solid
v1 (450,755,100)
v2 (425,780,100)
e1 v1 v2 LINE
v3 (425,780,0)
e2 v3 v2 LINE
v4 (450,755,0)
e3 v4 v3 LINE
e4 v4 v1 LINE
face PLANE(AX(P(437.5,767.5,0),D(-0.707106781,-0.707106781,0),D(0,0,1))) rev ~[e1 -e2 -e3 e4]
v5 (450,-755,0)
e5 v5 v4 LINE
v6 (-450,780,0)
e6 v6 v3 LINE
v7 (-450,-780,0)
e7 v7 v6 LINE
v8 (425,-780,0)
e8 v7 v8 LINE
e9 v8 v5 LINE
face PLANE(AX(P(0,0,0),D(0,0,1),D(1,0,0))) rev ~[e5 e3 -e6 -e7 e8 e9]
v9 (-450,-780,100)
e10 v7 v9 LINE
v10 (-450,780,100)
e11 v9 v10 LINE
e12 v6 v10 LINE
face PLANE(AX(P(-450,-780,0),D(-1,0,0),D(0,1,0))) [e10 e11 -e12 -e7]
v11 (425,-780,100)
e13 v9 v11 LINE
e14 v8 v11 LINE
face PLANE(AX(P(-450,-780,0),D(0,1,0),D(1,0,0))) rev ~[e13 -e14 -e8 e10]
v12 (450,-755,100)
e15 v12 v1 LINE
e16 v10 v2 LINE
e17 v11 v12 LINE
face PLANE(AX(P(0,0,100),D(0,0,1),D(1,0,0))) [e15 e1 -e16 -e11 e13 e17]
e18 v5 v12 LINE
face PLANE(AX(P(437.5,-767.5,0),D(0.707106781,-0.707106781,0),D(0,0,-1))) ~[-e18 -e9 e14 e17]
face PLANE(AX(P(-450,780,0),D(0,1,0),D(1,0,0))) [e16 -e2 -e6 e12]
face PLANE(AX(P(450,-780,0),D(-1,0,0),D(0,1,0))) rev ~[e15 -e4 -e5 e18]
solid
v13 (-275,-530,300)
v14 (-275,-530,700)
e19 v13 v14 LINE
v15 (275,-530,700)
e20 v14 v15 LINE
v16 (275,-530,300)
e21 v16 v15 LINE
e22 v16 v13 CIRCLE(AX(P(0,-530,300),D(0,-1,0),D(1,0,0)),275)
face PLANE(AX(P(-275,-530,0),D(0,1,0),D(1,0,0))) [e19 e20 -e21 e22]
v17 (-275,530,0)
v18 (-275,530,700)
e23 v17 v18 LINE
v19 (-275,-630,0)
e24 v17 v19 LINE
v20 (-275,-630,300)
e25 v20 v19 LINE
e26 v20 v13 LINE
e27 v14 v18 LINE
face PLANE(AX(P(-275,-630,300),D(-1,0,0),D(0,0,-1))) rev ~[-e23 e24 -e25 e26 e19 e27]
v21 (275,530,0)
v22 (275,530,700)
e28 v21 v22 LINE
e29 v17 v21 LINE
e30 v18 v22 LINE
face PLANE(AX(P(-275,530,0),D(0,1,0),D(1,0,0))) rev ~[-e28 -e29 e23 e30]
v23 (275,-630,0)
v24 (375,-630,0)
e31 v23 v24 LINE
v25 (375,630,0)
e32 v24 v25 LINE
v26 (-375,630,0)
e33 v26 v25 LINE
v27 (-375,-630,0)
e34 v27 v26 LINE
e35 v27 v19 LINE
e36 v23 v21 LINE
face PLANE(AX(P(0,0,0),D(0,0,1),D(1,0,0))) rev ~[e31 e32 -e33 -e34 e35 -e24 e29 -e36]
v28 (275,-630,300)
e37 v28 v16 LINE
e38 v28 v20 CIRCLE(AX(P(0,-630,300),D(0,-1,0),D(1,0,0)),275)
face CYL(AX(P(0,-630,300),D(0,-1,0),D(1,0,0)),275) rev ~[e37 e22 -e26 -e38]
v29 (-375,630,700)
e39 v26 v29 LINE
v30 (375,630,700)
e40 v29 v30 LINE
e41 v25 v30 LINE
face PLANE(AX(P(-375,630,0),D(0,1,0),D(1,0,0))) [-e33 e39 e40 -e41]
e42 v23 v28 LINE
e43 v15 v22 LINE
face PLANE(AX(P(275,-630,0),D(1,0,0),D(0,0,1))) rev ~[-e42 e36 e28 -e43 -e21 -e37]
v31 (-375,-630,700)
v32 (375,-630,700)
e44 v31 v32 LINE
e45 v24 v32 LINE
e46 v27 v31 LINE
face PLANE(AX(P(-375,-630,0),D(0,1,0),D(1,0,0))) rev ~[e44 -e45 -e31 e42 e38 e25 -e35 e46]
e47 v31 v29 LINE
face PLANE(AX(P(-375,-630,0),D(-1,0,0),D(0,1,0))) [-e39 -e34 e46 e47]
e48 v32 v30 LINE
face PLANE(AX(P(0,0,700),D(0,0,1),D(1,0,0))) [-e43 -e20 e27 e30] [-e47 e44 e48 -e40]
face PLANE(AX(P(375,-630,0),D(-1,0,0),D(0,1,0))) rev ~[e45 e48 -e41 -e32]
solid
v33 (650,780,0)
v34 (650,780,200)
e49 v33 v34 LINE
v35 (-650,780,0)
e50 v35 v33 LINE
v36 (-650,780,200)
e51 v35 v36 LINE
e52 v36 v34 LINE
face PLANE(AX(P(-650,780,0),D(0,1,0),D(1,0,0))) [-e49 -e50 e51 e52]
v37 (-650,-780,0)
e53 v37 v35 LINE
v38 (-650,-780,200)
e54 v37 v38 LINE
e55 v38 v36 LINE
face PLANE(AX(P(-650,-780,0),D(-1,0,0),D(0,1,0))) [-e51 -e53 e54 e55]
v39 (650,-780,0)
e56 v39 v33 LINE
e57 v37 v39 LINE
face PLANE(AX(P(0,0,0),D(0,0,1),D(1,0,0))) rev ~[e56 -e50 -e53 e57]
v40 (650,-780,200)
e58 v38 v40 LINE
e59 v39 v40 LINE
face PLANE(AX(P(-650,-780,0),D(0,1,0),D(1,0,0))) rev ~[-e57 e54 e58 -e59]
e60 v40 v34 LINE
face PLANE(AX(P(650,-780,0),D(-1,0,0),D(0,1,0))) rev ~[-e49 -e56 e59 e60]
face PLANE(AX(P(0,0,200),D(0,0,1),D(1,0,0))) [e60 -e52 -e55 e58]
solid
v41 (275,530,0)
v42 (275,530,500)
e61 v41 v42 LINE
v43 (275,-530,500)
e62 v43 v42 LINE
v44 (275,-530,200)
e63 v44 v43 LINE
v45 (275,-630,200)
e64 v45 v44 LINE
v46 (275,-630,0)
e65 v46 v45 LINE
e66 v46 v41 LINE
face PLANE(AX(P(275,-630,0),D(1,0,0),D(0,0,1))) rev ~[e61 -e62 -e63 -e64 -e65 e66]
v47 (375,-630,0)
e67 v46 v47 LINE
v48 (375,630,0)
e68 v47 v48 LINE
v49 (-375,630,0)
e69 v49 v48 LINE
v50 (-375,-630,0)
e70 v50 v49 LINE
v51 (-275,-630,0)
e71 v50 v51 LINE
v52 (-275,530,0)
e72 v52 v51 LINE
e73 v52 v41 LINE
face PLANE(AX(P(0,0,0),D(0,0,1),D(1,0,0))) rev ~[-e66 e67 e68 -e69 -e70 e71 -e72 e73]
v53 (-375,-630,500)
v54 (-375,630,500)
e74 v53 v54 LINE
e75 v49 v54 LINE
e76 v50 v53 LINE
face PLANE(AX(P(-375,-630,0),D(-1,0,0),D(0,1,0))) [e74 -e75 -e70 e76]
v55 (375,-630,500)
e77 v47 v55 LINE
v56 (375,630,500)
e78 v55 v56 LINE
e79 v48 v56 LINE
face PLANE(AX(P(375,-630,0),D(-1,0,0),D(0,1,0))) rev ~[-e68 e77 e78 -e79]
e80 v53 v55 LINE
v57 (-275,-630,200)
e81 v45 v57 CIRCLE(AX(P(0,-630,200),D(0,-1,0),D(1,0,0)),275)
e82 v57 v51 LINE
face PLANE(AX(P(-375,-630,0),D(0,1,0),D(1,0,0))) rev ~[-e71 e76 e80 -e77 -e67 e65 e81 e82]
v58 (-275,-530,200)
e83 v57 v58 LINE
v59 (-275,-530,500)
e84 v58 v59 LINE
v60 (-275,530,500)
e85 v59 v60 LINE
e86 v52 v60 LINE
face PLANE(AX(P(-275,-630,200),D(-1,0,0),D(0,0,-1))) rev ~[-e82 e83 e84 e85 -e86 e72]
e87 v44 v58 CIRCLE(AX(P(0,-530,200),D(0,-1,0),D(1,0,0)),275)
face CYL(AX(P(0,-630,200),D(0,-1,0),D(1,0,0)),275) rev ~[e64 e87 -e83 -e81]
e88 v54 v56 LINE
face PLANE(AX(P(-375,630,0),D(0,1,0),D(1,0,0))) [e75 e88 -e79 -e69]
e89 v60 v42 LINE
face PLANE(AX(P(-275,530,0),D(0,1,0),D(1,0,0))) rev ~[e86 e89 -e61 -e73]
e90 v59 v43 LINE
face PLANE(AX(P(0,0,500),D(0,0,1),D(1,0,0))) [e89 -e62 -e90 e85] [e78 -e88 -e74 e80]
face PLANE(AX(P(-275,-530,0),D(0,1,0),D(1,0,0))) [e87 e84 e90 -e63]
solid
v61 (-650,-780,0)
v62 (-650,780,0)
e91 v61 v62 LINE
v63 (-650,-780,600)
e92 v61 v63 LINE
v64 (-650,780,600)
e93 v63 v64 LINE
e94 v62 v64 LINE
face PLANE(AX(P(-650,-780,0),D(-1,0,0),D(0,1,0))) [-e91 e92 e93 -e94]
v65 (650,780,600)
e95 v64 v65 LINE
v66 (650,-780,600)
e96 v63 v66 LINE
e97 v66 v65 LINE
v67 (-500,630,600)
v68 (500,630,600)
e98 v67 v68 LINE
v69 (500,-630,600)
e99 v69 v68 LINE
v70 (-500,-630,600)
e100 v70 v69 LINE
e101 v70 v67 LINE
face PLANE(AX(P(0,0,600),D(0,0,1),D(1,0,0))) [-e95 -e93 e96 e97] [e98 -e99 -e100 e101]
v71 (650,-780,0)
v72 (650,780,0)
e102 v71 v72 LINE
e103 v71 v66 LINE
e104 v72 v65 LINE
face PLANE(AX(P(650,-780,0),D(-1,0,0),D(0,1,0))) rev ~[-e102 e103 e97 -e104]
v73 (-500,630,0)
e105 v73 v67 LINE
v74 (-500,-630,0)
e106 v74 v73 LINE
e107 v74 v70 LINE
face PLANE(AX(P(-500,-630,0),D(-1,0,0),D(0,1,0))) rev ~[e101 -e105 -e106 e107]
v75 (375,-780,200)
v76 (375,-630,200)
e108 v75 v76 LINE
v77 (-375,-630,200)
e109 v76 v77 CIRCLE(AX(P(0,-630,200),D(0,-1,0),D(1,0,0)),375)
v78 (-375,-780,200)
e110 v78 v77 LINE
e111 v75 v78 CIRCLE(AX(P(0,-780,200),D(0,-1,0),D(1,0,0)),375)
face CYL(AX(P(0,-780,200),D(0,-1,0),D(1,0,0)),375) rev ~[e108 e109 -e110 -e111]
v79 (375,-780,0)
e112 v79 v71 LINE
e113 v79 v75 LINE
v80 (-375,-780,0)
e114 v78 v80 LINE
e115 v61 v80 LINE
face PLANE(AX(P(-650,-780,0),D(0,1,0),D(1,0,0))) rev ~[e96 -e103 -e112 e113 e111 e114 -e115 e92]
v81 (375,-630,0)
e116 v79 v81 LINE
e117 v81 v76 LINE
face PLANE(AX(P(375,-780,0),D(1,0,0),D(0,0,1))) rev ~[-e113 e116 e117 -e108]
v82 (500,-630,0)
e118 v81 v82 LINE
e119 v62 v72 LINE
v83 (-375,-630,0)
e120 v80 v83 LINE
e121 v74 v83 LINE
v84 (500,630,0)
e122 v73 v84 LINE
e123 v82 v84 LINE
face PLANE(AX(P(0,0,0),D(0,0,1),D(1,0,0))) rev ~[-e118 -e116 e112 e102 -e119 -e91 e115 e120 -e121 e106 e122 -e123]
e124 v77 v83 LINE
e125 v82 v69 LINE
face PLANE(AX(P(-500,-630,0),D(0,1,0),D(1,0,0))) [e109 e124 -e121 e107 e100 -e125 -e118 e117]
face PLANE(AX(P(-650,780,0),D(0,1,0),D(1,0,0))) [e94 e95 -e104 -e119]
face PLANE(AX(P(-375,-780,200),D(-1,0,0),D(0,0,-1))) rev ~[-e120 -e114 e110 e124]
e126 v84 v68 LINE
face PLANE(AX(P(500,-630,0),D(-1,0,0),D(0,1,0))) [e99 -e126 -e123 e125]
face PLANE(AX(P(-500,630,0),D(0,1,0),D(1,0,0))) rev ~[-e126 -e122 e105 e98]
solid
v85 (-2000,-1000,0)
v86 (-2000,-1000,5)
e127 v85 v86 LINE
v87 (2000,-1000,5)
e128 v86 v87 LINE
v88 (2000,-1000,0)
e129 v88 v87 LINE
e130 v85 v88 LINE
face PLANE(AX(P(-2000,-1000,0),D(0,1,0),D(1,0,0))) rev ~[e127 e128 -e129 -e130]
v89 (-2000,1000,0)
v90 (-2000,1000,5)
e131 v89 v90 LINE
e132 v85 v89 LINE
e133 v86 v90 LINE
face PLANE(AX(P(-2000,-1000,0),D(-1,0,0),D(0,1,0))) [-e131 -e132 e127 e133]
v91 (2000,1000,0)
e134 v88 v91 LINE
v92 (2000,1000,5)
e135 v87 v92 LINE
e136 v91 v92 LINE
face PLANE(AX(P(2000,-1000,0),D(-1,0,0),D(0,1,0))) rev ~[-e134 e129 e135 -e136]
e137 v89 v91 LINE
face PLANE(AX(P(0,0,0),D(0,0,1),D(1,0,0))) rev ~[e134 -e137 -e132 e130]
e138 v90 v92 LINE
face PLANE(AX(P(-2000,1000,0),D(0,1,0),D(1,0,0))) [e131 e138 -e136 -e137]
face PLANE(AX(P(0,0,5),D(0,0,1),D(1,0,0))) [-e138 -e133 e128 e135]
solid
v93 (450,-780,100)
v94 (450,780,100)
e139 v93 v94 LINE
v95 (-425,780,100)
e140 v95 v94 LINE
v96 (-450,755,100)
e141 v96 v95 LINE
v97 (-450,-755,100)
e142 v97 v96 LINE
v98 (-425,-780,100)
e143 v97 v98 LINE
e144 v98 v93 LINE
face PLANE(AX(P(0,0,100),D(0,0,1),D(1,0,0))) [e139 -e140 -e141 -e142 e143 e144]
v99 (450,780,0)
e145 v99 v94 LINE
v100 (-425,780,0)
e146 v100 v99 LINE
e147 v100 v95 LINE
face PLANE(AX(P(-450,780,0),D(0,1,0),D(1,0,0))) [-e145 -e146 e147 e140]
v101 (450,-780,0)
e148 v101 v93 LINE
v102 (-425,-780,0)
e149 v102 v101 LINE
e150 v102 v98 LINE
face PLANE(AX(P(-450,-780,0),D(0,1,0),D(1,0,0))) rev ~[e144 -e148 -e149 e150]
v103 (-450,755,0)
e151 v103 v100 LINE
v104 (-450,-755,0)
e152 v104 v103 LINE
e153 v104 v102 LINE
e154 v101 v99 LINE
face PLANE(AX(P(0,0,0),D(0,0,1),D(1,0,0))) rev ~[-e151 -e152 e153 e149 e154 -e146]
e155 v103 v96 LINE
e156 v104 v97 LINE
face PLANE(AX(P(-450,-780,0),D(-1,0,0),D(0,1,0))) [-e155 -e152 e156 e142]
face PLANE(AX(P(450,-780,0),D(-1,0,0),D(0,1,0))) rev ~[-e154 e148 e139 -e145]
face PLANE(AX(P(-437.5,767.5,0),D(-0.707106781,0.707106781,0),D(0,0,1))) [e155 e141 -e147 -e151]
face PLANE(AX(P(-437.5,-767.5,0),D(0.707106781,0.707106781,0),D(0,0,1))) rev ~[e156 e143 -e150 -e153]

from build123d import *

# Parameters (mm, degrees)
F0_W      = 1300
F0_H      = 1560
F1_DEPTH  = 200
F2_W      = 1300
F2_H      = 1560
F2_W_2    = 1000
F2_H_2    = 1260
F3_DEPTH  = 600
F5_DEPTH  = 150
F6_W      = 750
F6_H      = 1260
F6_W_2    = 550
F6_H_2    = 1060
F7_DEPTH  = 700
F9_DEPTH  = 100
F10_W     = 900
F10_H     = 1560
F11_DEPTH = 100
F12_SIZE  = 25
F13_W     = 750
F13_H     = 1260
F13_W_2   = 550
F13_H_2   = 1060
F14_DEPTH = 500
F16_DEPTH = 100
F17_W     = 900
F17_H     = 1560
F18_DEPTH = 100
F19_SIZE  = 25
F20_W     = 4000
F20_H     = 2000
F21_DEPTH = 5


with BuildPart() as f1:
    # F0 (on Top) → F1 (new body)
    with BuildSketch(Plane.XY):
        Rectangle(F0_W, F0_H)
    extrude(amount=F1_DEPTH)


with BuildPart() as f3:
    # F2 (on Top) → F3 (new body)
    with BuildSketch(Plane.XY):
        Rectangle(F2_W, F2_H)
        Rectangle(F2_W_2, F2_H_2, mode=Mode.SUBTRACT)
    extrude(amount=F3_DEPTH)

    # F4 (on face) → F5 (cut, through all)
    with BuildSketch(Plane.XZ.offset(780)):
        with BuildLine():
            Line((-375, 200), (-375, 0))
            Line((-375, 0), (375, 0))
            Line((375, 0), (375, 200))
            ThreePointArc((375, 200), (0, 575), (-375, 200))
        make_face()
    extrude(amount=-F5_DEPTH, mode=Mode.SUBTRACT)


with BuildPart() as f7:
    # F6 (on Top) → F7 (new body)
    with BuildSketch(Plane.XY):
        Rectangle(F6_W, F6_H)
        Rectangle(F6_W_2, F6_H_2, mode=Mode.SUBTRACT)
    extrude(amount=F7_DEPTH)

    # F8 (on face) → F9 (cut, through all)
    with BuildSketch(Plane.XZ.offset(630)):
        with BuildLine():
            Line((-275, 300), (-275, 0))
            Line((-275, 0), (275, 0))
            Line((275, 0), (275, 300))
            ThreePointArc((275, 300), (0, 575), (-275, 300))
        make_face()
    extrude(amount=-F9_DEPTH, mode=Mode.SUBTRACT)


with BuildPart() as f11:
    # F10 (on Top) → F11 (new body)
    with BuildSketch(Plane.XY):
        Rectangle(F10_W, F10_H)
    extrude(amount=F11_DEPTH)

    # F12
    f12_edges = [f11.edges().sort_by_distance(p)[0] for p in [
        (450, -780, 50),
        (450, 780, 50),
    ]]
    chamfer(f12_edges, length=F12_SIZE)


with BuildPart() as f14:
    # F13 (on Top) → F14 (new body)
    with BuildSketch(Plane.XY):
        Rectangle(F13_W, F13_H)
        Rectangle(F13_W_2, F13_H_2, mode=Mode.SUBTRACT)
    extrude(amount=F14_DEPTH)

    # F15 (on face) → F16 (cut, through all)
    with BuildSketch(Plane.XZ.offset(630)):
        with BuildLine():
            Line((-275, 200), (-275, 0))
            Line((-275, 0), (275, 0))
            Line((275, 0), (275, 200))
            ThreePointArc((275, 200), (0, 475), (-275, 200))
        make_face()
    extrude(amount=-F16_DEPTH, mode=Mode.SUBTRACT)


with BuildPart() as f18:
    # F17 (on Top) → F18 (new body)
    with BuildSketch(Plane.XY):
        Rectangle(F17_W, F17_H)
    extrude(amount=F18_DEPTH)

    # F19
    f19_edges = [f18.edges().sort_by_distance(p)[0] for p in [
        (-450, -780, 50),
        (-450, 780, 50),
    ]]
    chamfer(f19_edges, length=F19_SIZE)


with BuildPart() as f21:
    # F20 (on Top) → F21 (new body)
    with BuildSketch(Plane.XY):
        Rectangle(F20_W, F20_H)
    extrude(amount=F21_DEPTH)


solid = Compound([f1.part, f3.part, f7.part, f11.part, f14.part, f18.part, f21.part])
